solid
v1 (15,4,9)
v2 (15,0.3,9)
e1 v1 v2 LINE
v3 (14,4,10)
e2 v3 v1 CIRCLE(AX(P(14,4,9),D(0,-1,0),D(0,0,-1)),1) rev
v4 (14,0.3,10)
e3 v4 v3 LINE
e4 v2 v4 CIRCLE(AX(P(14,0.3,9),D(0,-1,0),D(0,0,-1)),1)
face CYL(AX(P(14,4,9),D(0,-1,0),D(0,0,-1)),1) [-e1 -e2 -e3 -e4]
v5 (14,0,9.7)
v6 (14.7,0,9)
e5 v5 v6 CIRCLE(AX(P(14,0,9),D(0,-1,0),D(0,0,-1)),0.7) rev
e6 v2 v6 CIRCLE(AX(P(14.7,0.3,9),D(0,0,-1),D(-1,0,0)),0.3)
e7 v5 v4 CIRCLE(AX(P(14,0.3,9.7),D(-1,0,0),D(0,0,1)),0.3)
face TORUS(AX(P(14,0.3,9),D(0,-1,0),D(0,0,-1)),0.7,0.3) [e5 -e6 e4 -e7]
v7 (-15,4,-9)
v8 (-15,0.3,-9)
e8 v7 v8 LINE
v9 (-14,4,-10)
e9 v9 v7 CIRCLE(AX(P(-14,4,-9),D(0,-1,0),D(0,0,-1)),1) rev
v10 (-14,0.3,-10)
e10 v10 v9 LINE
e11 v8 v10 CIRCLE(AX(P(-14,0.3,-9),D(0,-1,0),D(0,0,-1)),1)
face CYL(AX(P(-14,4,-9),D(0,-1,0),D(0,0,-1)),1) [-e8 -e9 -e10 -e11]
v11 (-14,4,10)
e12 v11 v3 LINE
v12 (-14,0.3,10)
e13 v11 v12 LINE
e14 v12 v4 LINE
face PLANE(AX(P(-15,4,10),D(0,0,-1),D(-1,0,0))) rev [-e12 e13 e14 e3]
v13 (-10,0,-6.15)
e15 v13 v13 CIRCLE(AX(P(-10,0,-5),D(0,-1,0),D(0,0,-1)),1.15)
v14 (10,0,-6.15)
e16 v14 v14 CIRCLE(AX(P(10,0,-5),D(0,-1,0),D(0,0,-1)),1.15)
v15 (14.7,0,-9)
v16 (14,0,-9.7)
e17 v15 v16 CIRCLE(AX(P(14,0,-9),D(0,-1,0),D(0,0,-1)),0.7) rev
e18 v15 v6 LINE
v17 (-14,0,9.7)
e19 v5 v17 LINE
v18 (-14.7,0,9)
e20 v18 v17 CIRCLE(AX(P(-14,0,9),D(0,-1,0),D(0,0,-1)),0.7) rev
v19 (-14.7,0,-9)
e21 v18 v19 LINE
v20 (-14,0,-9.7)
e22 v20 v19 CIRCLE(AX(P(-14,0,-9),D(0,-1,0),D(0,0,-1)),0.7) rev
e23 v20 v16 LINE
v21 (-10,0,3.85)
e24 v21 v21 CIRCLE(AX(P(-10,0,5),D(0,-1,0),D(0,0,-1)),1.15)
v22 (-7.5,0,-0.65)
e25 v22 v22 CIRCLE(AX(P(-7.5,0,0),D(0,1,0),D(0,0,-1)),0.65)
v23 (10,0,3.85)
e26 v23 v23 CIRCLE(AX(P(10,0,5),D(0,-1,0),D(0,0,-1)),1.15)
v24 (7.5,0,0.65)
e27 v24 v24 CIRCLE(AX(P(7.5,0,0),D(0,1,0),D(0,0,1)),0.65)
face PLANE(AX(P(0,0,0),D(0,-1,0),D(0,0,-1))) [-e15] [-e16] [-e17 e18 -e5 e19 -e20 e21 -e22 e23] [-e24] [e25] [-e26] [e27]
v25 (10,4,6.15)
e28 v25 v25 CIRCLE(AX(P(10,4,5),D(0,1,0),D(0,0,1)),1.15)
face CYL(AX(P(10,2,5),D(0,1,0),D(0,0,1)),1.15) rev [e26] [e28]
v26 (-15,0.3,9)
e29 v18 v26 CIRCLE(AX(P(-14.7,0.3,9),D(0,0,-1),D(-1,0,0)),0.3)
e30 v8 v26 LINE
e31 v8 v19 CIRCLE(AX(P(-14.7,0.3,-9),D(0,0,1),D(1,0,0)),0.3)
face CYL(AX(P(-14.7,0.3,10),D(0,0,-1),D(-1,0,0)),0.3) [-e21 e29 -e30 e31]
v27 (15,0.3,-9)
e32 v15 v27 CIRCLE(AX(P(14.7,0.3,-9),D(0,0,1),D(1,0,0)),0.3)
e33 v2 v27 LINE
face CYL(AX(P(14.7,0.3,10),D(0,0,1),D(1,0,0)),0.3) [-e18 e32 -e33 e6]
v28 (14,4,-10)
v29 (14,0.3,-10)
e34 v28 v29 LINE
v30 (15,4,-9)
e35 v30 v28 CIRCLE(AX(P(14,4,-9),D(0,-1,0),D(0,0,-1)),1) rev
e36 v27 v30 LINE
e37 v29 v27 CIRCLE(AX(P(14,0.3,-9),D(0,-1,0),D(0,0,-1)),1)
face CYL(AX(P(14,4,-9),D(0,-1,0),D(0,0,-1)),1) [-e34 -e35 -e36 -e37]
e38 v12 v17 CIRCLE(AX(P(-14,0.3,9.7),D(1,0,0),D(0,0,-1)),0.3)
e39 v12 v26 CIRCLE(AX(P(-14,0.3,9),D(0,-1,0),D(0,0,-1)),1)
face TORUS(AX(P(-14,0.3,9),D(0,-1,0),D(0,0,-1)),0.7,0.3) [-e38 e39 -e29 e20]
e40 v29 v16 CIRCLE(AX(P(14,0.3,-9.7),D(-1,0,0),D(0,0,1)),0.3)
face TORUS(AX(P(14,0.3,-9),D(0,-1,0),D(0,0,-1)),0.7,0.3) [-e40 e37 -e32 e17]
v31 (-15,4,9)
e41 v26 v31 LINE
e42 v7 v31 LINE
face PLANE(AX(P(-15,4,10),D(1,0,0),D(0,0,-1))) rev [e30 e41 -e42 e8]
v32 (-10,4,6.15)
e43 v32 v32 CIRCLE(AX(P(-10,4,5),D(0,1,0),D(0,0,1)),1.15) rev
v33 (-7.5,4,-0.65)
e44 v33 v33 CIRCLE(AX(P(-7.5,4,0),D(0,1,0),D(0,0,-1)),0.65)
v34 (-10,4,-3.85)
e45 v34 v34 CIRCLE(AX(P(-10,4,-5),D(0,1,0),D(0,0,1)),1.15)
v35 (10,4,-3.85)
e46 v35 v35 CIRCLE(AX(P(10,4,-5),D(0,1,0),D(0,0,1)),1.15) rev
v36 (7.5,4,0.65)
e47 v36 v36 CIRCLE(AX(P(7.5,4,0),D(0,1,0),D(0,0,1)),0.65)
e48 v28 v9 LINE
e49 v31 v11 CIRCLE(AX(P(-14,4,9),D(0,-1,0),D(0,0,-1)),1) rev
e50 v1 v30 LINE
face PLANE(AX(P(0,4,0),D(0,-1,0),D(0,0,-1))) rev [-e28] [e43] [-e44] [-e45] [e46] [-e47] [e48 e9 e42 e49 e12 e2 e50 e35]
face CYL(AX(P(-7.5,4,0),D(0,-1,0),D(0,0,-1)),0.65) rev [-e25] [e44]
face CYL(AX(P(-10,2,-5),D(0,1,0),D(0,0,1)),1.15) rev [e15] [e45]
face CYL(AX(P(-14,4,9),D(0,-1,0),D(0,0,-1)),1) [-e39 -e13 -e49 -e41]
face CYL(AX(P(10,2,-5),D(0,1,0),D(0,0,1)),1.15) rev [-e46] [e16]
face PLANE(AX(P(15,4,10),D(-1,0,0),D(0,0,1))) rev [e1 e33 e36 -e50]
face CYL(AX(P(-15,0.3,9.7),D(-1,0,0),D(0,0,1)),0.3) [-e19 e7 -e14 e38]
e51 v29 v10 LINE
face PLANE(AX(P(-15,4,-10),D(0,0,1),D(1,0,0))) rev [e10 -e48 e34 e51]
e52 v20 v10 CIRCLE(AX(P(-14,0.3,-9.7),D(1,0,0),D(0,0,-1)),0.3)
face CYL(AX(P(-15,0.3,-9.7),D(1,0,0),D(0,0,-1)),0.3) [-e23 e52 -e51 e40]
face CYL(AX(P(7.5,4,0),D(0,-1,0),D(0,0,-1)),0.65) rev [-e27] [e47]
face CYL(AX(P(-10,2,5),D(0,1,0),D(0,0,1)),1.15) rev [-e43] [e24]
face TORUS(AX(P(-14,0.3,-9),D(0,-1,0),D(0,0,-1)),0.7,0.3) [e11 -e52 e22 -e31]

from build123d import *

# Parameters (mm, degrees)
SKETCH3_W           = 30
SKETCH3_H           = 20
SKETCH3_R           = 0.65
BOSS_EXTRUDE5_DEPTH = 4
CUT_EXTRUDE1_DEPTH  = 2
FILLET1_R           = 0.3
FILLET2_R           = 1
SKETCH10_R          = 1.15
SKETCH10_R_2        = 0.65
CUT_EXTRUDE3_DEPTH  = 10
FILLET3_R           = 1


with BuildPart() as part:
    # Sketch3 → Boss-Extrude5 (new body)
    with BuildSketch(Plane(origin=(0, 0, 0), x_dir=(1, 0, 0), z_dir=(0, 1, 0))):
        Rectangle(SKETCH3_W, SKETCH3_H)
        with Locations(Location((7.5, 0, 0), (0, 0, 270))):
            Circle(SKETCH3_R, mode=Mode.SUBTRACT)
        with Locations(Location((-7.5, 0, 0), (0, 0, 90))):
            Circle(SKETCH3_R, mode=Mode.SUBTRACT)
    extrude(amount=BOSS_EXTRUDE5_DEPTH)

    # Sketch6 → Cut-Extrude1 (cut)
    with BuildSketch(Plane(origin=(0, 4, 0), x_dir=(1, 0, 0), z_dir=(0, 1, 0))):
        with BuildLine():
            Line((-8.85, 5), (-10, 5))
            Line((-10, 5), (-10, 3.85))
            ThreePointArc((-10, 3.85), (-9.186827202, 4.186827202), (-8.85, 5))
        make_face()
        with BuildLine():
            Line((-10, 3.85), (-10, 5))
            Line((-10, 5), (-8.85, 5))
            ThreePointArc((-8.85, 5), (-10.813172798, 5.813172798), (-10, 3.85))
        make_face()
        with BuildLine():
            ThreePointArc((11.15, 5), (10, 6.15), (8.85, 5))
            Line((8.85, 5), (10, 5))
            Line((10, 5), (10, 3.85))
            ThreePointArc((10, 3.85), (10.813172798, 4.186827202), (11.15, 5))
        make_face()
        with BuildLine():
            Line((10, 5), (8.85, 5))
            ThreePointArc((8.85, 5), (9.186827202, 4.186827202), (10, 3.85))
            Line((10, 3.85), (10, 5))
        make_face()
        with BuildLine():
            ThreePointArc((10, -3.85), (9.186827202, -4.186827202), (8.85, -5))
            Line((8.85, -5), (10, -5))
            Line((10, -5), (10, -3.85))
        make_face()
        with BuildLine():
            Line((10, -5), (8.85, -5))
            ThreePointArc((8.85, -5), (10, -6.15), (11.15, -5))
            ThreePointArc((11.15, -5), (10.813172798, -4.186827202), (10, -3.85))
            Line((10, -3.85), (10, -5))
        make_face()
        with BuildLine():
            ThreePointArc((-8.85, -5), (-9.186827202, -4.186827202), (-10, -3.85))
            Line((-10, -3.85), (-10, -5))
            Line((-10, -5), (-8.85, -5))
        make_face()
        with BuildLine():
            Line((-10, -5), (-10, -3.85))
            ThreePointArc((-10, -3.85), (-10.813172798, -5.813172798), (-8.85, -5))
            Line((-8.85, -5), (-10, -5))
        make_face()
    extrude(amount=-CUT_EXTRUDE1_DEPTH, mode=Mode.SUBTRACT)

    # Fillet1
    fillet1_edges = [part.edges().sort_by_distance(p)[0] for p in [
        (0, 0, 10),
        (-15, 0, 0),
        (0, 0, -10),
        (15, 0, 0),
    ]]
    fillet(fillet1_edges, radius=FILLET1_R)

    # Fillet2
    # the kernel refuses this fillet: 1 mm, written as the material it takes off along each edge
    with BuildSketch(Plane(origin=(14, 0, 9), x_dir=(1, 0, 0), z_dir=(0, 0, -1))) as fillet2_piece_1:
        with BuildLine():
            CenterArc((0.7, -0.3), 0.3, 0, 90)
            Line((1, -0.3), (1, 0))
            Line((1, 0), (0.7, 0))
        make_face()
    revolve(axis=Axis((14, 0, 9), (0, -1, 0)), revolution_arc=90, mode=Mode.SUBTRACT)
    with BuildSketch(Plane(origin=(14, 0, -9), x_dir=(0, 0, -1), z_dir=(-1, 0, 0))) as fillet2_piece_2:
        with BuildLine():
            CenterArc((0.7, -0.3), 0.3, 0, 90)
            Line((1, -0.3), (1, 0))
            Line((1, 0), (0.7, 0))
        make_face()
    revolve(axis=Axis((14, 0, -9), (0, -1, 0)), revolution_arc=90, mode=Mode.SUBTRACT)
    with BuildSketch(Plane(origin=(15, 0, 10), x_dir=(-1, 0, 0), z_dir=(0, 1, 0)), Plane(origin=(15, 0, -10), x_dir=(0, 0, 1), z_dir=(0, 1, 0))) as fillet2_piece_3:
        with BuildLine():
            CenterArc((FILLET2_R, -FILLET2_R), FILLET2_R, 90, 90)
            Line((0, -FILLET2_R), (0, 0))
            Line((0, 0), (FILLET2_R, 0))
        make_face()
    extrude(amount=6.5, mode=Mode.SUBTRACT)

    # Sketch10 → Cut-Extrude3 (cut)
    with BuildSketch(Plane(origin=(0, 2, 0), x_dir=(1, 0, 0), z_dir=(0, 1, 0))):
        with Locations(Location((10, -5, 0), (0, 0, 270))):
            Circle(SKETCH10_R)
        with Locations(Location((-7.5, 0, 0), (0, 0, 90))):
            Circle(SKETCH10_R_2)
        with Locations(Location((-10, 5, 0), (0, 0, 270))):
            Circle(SKETCH10_R)
        with Locations(Location((7.5, 0, 0), (0, 0, 270))):
            Circle(SKETCH10_R_2)
        with Locations(Location((10, 5, 0), (0, 0, 270))):
            Circle(SKETCH10_R)
        with Locations(Location((-10, -5, 0), (0, 0, 270))):
            Circle(SKETCH10_R)
    extrude(amount=-CUT_EXTRUDE3_DEPTH, mode=Mode.SUBTRACT)

    # Fillet3
    # the kernel refuses this fillet: 1 mm, written as the material it takes off along each edge
    with BuildSketch(Plane(origin=(-14, 0, 9), x_dir=(0, 0, 1), z_dir=(1, 0, 0))) as fillet3_piece_1:
        with BuildLine():
            CenterArc((0.7, -0.3), 0.3, 0, 90)
            Line((1, -0.3), (1, 0))
            Line((1, 0), (0.7, 0))
        make_face()
    revolve(axis=Axis((-14, 0, 9), (0, -1, 0)), revolution_arc=90, mode=Mode.SUBTRACT)
    with BuildSketch(Plane(origin=(-14, 0, -9), x_dir=(-1, 0, 0), z_dir=(0, 0, 1))) as fillet3_piece_2:
        with BuildLine():
            CenterArc((0.7, -0.3), 0.3, 0, 90)
            Line((1, -0.3), (1, 0))
            Line((1, 0), (0.7, 0))
        make_face()
    revolve(axis=Axis((-14, 0, -9), (0, -1, 0)), revolution_arc=90, mode=Mode.SUBTRACT)
    with BuildSketch(Plane(origin=(-15, 0, 10), x_dir=(1, 0, 0), z_dir=(0, 1, 0)), Plane(origin=(-15, 0, -10), x_dir=(0, 0, 1), z_dir=(0, 1, 0))) as fillet3_piece_3:
        with BuildLine():
            CenterArc((FILLET3_R, FILLET3_R), FILLET3_R, 180, 90)
            Line((0, FILLET3_R), (0, 0))
            Line((0, 0), (FILLET3_R, 0))
        make_face()
    extrude(amount=6.5, mode=Mode.SUBTRACT)


solid = part.part
